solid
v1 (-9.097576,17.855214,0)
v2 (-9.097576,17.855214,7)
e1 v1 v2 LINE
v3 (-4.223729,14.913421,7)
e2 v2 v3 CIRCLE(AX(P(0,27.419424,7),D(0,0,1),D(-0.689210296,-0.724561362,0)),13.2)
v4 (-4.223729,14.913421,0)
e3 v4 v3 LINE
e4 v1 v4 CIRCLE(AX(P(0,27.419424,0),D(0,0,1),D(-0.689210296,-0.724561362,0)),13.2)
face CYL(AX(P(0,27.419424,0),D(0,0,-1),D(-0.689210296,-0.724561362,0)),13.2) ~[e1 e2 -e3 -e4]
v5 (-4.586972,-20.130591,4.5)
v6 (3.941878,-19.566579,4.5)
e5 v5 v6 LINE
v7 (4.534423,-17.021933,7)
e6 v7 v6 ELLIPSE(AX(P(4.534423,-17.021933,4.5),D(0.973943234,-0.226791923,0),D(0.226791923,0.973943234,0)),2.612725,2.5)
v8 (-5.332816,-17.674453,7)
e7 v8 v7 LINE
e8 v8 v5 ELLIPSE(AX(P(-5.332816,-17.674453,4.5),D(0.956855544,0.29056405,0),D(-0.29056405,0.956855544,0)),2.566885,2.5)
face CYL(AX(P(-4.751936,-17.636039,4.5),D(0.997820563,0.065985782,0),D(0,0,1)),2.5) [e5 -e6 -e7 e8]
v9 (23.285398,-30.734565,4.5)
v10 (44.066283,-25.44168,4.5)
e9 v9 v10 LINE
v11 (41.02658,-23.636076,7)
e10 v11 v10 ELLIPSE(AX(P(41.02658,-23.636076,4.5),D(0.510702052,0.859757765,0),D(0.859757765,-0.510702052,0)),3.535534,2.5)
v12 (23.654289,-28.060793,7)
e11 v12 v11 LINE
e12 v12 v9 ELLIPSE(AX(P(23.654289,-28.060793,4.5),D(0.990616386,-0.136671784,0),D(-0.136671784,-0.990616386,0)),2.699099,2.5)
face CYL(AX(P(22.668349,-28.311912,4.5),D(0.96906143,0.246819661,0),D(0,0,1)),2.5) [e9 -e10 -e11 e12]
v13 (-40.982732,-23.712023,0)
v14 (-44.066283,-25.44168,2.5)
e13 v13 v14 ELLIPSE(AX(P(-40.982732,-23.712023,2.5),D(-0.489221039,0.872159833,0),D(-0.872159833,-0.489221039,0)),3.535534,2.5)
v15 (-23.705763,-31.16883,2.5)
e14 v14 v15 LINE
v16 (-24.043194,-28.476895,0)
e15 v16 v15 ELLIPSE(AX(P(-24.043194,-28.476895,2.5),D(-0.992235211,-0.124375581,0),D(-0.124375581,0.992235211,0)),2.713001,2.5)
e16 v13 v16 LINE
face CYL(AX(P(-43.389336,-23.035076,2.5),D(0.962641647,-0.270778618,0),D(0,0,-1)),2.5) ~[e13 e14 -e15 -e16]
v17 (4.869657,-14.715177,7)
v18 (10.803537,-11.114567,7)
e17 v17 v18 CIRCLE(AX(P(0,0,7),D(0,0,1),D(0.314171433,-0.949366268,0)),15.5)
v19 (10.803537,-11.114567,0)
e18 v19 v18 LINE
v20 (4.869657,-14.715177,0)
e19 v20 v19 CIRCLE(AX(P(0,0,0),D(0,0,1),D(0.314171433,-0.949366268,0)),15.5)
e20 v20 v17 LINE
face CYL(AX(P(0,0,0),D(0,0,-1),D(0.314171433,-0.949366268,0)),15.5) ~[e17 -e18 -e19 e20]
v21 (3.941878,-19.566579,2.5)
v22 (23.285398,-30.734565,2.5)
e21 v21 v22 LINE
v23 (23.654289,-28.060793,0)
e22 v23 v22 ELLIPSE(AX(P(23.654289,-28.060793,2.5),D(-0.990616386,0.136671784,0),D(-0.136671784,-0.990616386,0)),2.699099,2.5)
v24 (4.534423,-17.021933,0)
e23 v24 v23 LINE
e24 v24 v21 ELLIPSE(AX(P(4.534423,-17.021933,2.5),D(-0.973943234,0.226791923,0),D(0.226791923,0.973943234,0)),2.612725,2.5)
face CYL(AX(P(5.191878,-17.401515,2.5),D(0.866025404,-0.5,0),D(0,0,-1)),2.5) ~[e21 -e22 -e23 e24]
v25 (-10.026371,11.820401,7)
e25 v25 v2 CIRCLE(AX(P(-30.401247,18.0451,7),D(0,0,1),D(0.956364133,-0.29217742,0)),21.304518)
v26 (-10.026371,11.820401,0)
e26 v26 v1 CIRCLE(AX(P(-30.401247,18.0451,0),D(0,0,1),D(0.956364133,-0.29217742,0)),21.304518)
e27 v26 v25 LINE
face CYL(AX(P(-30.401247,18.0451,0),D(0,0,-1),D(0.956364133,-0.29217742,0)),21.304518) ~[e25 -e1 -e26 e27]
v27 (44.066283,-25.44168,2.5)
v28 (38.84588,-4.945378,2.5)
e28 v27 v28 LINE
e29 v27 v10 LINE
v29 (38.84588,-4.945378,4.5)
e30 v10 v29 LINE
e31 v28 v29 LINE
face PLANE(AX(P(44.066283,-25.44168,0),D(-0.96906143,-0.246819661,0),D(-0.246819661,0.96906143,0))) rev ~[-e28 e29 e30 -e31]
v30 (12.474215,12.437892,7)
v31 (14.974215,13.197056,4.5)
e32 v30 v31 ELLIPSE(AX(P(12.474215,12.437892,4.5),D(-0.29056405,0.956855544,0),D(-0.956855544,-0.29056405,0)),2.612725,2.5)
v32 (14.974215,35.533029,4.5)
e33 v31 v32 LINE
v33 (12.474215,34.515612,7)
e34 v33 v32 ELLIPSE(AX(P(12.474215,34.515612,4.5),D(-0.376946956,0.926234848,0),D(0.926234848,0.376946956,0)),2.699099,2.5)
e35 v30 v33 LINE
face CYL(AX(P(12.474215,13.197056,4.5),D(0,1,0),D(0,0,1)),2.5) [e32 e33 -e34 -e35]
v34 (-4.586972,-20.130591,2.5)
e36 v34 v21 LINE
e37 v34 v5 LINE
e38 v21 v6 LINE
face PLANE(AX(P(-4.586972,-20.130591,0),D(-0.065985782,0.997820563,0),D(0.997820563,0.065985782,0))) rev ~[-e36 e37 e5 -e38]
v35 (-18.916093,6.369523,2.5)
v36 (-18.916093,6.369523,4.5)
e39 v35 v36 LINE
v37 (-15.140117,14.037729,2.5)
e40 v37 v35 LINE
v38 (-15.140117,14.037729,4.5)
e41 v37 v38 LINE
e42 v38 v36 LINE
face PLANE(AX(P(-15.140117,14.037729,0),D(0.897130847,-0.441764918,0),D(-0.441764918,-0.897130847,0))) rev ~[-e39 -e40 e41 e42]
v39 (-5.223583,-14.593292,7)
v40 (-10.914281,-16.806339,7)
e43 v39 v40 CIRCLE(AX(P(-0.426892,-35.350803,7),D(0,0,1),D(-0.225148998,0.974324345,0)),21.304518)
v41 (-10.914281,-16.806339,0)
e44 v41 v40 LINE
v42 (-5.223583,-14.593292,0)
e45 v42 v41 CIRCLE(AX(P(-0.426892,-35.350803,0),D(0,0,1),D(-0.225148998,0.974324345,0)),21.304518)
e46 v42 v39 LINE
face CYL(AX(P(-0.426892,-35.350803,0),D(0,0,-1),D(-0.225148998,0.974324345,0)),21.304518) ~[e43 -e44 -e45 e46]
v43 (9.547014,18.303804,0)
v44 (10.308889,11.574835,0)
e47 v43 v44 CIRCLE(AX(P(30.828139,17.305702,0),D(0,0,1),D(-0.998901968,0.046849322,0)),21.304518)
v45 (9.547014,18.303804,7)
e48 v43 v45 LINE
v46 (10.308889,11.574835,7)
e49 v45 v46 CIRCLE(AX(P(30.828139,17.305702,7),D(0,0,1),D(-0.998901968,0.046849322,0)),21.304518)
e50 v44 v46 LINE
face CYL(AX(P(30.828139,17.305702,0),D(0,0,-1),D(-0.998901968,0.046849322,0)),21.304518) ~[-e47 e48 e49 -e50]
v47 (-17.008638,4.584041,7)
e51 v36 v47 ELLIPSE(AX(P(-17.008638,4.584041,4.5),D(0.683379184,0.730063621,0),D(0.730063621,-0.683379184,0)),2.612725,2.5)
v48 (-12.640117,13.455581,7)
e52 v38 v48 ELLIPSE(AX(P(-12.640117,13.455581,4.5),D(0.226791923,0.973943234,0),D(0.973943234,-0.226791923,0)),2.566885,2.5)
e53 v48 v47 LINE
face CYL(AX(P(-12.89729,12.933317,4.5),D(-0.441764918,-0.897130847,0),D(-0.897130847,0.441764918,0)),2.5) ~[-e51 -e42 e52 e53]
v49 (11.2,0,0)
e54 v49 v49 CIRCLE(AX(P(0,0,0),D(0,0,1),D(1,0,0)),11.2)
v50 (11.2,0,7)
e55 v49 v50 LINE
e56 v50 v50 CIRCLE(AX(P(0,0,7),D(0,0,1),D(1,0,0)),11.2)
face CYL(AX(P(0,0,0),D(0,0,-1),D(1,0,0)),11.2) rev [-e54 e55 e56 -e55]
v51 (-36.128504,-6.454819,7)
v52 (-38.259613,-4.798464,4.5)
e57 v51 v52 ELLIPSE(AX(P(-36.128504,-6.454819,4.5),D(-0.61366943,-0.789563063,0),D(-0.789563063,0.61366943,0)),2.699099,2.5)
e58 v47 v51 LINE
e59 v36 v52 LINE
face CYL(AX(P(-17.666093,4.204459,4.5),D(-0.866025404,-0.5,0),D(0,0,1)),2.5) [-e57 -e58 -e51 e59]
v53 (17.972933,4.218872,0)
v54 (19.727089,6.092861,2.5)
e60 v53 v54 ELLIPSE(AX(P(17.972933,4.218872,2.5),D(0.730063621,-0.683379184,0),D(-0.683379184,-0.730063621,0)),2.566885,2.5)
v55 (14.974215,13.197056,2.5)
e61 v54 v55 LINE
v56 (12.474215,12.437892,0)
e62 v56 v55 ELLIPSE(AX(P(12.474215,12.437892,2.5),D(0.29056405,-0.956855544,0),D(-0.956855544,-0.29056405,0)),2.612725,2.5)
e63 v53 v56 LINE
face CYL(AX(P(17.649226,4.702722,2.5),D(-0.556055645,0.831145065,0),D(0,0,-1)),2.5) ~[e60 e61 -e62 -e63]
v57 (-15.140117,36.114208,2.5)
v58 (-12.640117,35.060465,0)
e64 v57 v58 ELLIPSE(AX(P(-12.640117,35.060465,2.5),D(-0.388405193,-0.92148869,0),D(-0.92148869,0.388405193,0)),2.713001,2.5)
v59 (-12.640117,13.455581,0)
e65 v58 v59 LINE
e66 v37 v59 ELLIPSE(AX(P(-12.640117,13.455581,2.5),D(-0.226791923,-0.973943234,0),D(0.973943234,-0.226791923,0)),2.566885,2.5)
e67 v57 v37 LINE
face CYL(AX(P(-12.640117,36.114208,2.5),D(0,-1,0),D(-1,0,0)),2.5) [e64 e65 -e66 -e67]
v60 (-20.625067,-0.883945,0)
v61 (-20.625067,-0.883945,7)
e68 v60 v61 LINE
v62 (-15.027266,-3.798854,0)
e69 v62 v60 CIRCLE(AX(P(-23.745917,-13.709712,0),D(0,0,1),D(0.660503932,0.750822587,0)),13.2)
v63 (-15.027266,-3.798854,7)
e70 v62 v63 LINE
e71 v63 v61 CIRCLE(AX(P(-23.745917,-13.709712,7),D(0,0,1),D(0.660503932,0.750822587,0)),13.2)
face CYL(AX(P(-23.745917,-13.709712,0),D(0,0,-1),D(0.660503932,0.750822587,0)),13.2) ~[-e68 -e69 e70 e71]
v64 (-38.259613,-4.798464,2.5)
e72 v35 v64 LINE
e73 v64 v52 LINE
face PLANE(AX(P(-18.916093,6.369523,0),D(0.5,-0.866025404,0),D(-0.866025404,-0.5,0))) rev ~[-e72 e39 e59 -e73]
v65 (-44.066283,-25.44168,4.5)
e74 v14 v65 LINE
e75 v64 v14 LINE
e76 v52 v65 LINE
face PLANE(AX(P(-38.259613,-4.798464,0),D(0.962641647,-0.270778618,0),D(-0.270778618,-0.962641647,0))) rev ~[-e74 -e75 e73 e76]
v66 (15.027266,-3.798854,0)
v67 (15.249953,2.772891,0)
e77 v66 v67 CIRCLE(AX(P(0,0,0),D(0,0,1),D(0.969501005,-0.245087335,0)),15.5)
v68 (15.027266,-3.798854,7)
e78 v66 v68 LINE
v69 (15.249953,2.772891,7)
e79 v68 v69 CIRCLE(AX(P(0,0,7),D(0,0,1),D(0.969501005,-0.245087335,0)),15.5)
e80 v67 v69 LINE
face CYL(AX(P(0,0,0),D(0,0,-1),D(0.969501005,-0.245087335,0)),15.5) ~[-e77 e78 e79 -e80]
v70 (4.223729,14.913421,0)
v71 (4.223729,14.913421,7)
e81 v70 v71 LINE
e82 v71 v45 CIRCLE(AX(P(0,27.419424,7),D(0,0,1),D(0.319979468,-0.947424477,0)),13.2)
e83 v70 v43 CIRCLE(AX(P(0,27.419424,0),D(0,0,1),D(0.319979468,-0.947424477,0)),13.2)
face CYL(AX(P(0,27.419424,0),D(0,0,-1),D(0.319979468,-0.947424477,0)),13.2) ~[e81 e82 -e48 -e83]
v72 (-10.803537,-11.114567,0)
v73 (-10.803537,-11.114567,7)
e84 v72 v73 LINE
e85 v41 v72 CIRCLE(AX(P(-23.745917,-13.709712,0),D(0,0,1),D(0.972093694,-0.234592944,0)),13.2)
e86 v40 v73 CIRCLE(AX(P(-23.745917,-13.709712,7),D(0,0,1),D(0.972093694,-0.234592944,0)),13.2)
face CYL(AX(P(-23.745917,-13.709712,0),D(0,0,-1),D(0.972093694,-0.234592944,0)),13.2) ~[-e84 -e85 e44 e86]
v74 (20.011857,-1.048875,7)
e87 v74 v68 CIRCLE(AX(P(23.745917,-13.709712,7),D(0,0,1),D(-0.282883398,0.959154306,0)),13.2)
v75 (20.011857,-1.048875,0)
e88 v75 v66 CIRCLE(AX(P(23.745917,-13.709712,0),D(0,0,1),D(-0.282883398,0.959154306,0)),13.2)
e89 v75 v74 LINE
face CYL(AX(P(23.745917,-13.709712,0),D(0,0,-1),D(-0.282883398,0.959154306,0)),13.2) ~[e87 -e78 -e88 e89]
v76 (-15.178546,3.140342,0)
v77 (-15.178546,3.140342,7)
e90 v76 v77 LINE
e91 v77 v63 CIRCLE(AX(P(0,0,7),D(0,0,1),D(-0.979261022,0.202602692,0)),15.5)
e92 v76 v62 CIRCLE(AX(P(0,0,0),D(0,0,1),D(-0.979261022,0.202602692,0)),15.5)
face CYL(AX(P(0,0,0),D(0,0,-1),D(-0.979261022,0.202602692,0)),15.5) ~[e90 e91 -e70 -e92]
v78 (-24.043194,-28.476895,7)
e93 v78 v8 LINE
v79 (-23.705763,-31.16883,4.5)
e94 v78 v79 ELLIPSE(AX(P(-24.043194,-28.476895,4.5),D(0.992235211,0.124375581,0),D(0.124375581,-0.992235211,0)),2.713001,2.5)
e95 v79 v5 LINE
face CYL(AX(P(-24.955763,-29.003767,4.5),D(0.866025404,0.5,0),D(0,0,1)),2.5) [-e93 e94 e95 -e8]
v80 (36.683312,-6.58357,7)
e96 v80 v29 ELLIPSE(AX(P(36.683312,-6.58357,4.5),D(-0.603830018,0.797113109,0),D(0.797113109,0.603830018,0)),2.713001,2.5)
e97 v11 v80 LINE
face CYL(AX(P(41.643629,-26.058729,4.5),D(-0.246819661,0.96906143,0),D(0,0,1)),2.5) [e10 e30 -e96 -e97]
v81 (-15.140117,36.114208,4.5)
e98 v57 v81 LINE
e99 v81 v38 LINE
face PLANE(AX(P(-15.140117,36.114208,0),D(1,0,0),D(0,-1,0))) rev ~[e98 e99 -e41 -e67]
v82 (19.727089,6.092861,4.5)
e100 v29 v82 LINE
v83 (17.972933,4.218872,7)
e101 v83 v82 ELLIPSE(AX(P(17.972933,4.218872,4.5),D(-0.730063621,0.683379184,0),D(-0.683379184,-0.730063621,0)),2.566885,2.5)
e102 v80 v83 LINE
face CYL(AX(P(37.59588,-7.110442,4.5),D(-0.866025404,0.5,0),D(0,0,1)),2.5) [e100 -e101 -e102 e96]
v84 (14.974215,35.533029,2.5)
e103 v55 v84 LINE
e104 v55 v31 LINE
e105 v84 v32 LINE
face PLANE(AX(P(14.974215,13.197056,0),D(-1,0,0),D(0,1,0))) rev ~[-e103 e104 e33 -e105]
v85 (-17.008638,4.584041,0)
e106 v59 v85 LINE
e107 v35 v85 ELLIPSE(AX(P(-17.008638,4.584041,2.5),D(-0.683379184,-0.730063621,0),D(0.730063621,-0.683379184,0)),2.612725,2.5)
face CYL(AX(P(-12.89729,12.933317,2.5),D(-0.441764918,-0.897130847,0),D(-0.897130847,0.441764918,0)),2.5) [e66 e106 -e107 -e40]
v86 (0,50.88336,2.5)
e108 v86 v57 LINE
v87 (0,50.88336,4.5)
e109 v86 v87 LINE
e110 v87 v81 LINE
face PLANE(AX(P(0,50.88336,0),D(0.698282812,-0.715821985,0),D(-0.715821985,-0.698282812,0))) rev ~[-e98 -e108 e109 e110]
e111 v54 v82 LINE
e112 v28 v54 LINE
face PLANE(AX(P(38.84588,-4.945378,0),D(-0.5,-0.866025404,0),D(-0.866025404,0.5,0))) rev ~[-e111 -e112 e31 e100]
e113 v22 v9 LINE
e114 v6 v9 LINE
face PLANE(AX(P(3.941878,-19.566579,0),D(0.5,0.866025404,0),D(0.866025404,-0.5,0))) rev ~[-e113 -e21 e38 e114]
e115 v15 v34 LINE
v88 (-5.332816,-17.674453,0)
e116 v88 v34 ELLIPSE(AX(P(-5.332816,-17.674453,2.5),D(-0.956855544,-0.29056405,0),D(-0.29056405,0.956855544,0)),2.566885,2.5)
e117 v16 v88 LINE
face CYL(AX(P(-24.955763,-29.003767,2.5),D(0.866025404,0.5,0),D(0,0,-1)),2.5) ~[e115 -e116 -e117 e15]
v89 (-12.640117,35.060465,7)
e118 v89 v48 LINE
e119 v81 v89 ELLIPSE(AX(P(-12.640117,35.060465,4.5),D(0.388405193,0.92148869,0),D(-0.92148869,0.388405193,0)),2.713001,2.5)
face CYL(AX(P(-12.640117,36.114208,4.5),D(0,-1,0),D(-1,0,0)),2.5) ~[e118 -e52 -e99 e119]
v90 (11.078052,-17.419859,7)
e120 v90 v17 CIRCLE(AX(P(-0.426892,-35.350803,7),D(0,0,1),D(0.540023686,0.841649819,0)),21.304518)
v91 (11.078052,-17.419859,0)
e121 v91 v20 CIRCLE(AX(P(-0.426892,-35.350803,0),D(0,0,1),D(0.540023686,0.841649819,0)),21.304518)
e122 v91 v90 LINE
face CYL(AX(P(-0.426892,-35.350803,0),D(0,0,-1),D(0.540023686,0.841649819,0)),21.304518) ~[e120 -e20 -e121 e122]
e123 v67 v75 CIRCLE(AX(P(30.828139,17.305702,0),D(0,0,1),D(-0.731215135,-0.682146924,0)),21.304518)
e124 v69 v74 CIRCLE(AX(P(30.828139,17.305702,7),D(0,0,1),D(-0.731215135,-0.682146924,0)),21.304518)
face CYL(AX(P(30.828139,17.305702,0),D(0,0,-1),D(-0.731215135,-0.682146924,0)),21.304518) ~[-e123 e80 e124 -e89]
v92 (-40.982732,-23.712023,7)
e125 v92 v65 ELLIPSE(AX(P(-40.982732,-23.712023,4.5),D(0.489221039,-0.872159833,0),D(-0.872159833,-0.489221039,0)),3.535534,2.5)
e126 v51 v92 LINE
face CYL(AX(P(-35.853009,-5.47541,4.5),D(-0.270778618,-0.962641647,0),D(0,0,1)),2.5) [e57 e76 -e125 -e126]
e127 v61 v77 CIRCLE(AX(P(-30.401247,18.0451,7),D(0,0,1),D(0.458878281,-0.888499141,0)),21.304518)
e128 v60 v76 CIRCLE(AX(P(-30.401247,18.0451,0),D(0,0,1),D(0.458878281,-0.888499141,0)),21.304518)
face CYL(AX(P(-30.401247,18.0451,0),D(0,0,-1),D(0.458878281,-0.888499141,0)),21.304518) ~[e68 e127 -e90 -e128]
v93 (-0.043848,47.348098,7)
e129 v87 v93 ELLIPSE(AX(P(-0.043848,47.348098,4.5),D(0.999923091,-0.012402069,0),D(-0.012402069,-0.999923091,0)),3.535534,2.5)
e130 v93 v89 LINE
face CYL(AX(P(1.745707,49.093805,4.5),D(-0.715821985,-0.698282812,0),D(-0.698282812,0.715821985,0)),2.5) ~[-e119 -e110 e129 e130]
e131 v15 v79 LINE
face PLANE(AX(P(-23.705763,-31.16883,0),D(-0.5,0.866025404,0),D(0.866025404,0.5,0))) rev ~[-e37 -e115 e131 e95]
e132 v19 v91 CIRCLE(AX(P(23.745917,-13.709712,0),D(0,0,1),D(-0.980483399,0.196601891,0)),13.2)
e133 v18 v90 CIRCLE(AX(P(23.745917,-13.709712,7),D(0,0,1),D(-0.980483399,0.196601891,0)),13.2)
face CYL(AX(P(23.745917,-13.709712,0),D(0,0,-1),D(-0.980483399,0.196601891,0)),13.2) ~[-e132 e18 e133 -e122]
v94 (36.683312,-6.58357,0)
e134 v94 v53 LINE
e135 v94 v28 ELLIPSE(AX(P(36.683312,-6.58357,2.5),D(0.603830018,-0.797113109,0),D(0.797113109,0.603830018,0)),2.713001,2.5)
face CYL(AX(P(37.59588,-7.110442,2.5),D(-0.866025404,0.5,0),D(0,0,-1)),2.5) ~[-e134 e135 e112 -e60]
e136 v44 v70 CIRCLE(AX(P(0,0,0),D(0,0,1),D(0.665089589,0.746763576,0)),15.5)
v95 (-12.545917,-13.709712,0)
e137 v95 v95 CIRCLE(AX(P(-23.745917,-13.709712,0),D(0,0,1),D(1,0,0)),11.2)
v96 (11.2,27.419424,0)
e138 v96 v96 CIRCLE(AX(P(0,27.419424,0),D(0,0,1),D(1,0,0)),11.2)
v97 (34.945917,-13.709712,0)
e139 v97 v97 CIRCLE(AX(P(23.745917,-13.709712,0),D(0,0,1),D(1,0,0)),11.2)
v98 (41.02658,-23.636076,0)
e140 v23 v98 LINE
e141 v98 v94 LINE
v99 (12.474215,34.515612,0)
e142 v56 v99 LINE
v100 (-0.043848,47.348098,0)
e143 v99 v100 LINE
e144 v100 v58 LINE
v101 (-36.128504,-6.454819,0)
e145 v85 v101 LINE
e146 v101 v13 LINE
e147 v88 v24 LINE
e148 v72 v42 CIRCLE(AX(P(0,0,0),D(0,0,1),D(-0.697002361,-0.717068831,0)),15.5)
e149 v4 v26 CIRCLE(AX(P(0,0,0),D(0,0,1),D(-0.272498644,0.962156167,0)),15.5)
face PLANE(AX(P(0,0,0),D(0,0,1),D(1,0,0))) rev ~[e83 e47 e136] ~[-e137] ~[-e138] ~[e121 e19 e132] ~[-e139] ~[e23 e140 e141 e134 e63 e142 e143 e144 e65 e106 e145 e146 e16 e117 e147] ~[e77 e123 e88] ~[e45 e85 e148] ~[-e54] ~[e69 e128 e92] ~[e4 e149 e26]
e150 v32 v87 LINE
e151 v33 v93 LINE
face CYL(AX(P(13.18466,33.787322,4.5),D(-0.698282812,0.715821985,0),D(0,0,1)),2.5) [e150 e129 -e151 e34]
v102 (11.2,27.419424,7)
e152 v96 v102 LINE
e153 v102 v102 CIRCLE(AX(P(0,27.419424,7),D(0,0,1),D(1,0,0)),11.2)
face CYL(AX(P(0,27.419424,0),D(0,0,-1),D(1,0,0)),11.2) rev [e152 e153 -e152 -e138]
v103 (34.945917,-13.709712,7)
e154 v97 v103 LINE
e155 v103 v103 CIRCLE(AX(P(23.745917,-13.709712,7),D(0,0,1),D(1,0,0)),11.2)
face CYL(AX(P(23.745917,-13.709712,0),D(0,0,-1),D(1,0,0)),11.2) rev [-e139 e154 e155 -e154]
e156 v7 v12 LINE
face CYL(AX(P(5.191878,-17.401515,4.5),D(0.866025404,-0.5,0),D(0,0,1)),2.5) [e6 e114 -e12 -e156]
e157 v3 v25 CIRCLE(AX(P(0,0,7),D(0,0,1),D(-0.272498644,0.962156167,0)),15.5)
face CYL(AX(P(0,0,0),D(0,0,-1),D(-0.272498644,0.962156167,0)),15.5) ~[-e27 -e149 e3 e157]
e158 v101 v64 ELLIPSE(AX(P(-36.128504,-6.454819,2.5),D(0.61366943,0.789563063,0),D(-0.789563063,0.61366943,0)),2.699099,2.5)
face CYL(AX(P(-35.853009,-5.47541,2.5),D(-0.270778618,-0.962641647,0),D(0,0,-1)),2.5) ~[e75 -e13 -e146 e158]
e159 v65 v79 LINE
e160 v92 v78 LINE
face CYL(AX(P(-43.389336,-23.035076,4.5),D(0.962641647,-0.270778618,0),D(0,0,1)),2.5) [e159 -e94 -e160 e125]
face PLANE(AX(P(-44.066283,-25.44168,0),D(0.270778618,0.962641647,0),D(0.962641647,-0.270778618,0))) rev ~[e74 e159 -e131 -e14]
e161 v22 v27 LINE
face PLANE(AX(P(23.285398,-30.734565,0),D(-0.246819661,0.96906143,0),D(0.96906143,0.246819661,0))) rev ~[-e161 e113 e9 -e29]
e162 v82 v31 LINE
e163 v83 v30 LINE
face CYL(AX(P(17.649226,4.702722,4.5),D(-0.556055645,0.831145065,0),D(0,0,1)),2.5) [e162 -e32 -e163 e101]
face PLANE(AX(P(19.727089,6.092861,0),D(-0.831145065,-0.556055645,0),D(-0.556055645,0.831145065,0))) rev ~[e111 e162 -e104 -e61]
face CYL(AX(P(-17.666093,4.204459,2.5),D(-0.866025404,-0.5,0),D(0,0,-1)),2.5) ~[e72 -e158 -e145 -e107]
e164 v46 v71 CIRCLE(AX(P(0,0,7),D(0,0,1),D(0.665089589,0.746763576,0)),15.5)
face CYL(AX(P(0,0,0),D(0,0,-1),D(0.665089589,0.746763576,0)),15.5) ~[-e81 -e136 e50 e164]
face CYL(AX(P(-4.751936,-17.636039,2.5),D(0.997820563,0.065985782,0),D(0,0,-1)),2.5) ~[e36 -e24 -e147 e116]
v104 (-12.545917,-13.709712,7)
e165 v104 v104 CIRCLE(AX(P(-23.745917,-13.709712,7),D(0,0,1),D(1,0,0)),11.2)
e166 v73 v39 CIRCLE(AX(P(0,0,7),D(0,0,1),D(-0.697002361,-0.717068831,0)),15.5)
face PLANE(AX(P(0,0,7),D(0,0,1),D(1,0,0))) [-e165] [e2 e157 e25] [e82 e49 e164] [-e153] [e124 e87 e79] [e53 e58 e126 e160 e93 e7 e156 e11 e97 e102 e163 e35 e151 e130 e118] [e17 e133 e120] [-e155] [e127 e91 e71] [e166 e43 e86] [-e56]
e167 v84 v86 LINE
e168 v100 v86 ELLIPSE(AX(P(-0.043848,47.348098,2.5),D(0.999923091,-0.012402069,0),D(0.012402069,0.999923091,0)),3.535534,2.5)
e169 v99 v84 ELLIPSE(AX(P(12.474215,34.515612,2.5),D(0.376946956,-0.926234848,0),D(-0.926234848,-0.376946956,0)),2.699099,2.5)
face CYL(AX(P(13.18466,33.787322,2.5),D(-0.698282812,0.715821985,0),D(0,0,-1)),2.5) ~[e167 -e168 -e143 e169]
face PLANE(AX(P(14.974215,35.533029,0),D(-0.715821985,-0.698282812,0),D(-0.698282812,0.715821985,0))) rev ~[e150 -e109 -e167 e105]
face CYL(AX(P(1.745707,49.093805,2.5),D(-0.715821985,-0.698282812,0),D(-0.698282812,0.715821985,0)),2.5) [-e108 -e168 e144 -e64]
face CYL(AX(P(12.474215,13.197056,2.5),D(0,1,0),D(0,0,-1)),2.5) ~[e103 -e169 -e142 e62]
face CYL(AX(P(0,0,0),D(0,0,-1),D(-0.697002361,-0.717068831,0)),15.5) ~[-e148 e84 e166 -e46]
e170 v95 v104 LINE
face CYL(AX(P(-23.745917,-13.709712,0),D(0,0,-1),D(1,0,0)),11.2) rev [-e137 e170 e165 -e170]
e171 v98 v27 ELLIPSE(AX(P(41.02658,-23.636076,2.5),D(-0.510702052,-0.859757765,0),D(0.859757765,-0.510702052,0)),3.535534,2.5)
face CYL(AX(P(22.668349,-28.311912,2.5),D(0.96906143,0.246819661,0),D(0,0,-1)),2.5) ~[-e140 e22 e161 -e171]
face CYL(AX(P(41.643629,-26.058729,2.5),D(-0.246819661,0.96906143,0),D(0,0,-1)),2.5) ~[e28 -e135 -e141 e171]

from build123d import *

# Parameters (mm, degrees)
F0_R     = 11.2
F1_DEPTH = 7
F3_DEPTH = 7
F4_DEPTH = 7
F5_R     = 2.5


# Not quite as in the source:
# - the program builds the solid bodies; features that only make, move or delete a surface that nothing else refers to are left out


with BuildPart() as f1:
    # F0 (on Top) → F1 (new body)
    with BuildSketch(Plane.XY):
        Polygon((-15.1401171461, 36.1142084002), (-15.1401171461, 14.037729241), (-18.916093286, 6.3695226165), (-38.2596134255, -4.7984639431), (-44.0662825692, -25.4416801035), (-23.7057633391, -31.1688302649), (-4.5869715611, -20.1305906853), (3.9418782472, -19.5665786343), (23.2853983866, -30.7345651939), (44.0662825692, -25.4416801035), (38.8458804852, -4.9453781354), (19.7270887072, 6.0928614443), (14.9742150389, 13.1970560178), (14.9742150389, 35.533029137), (0, 50.8833602071), align=None)
        with Locations((-23.7459174679, -13.7097118422)):
            Circle(F0_R, mode=Mode.SUBTRACT)
        with BuildLine():
            ThreePointArc((-5.2235825218, -14.5932924879), (-8.1486251459, -15.4948890799), (-10.9142807021, -16.8063387022))
            ThreePointArc((-10.9142807021, -16.8063387022), (-10.5484153212, -13.966494024), (-10.8035365954, -11.1145668846))
            ThreePointArc((-10.8035365954, -11.1145668846), (-8.2001536422, -13.1532307911), (-5.2235825218, -14.5932924879))
        make_face(mode=Mode.SUBTRACT)
        with BuildLine():
            ThreePointArc((-15.1785458421, 3.1403417202), (-15.4963179195, -0.3378327056), (-15.0272655718, -3.7988537))
            ThreePointArc((-15.0272655718, -3.7988537), (-17.6493915658, -2.0019207643), (-20.6250668218, -0.88394515))
            ThreePointArc((-20.6250668218, -0.88394515), (-17.7408860989, 0.9104067971), (-15.1785458421, 3.1403417202))
        make_face(mode=Mode.SUBTRACT)
        with BuildLine():
            ThreePointArc((4.8696572148, -14.7151771518), (8.040730665, -13.2512886306), (10.8035365954, -11.1145668846))
            ThreePointArc((10.8035365954, -11.1145668846), (10.5584100211, -14.2838610751), (11.0780523663, -17.4198592474))
            ThreePointArc((11.0780523663, -17.4198592474), (8.0820076354, -15.8192614458), (4.8696572148, -14.7151771518))
        make_face(mode=Mode.SUBTRACT)
        with Locations((23.7459174679, -13.7097118422)):
            Circle(F0_R, mode=Mode.SUBTRACT)
        with BuildLine():
            ThreePointArc((15.2499532803, 2.7728910813), (17.493280145, 0.6905281577), (20.0118566117, -1.0488750009))
            ThreePointArc((20.0118566117, -1.0488750009), (17.3695462872, -2.1519486258), (15.0272655718, -3.7988537))
            ThreePointArc((15.0272655718, -3.7988537), (15.491108828, -0.5249259735), (15.2499532803, 2.7728910813))
        make_face(mode=Mode.SUBTRACT)
        Circle(F0_R, mode=Mode.SUBTRACT)
        with BuildLine():
            ThreePointArc((-9.0975759097, 17.8552137031), (-6.821130966, 16.1184426499), (-4.2237289764, 14.9134205846))
            ThreePointArc((-4.2237289764, 14.9134205846), (-7.2909551859, 13.6781567646), (-10.0263707585, 11.8204014066))
            ThreePointArc((-10.0263707585, 11.8204014066), (-9.3446549991, 14.8043609222), (-9.0975759097, 17.8552137031))
        make_face(mode=Mode.SUBTRACT)
        with BuildLine():
            ThreePointArc((4.2237289764, 14.9134205846), (7.0909815446, 16.2857818394), (9.5470144555, 18.3038043974))
            ThreePointArc((9.5470144555, 18.3038043974), (9.6588784635, 14.9088546487), (10.3088886273, 11.5748354317))
            ThreePointArc((10.3088886273, 11.5748354317), (7.4555872545, 13.5891213362), (4.2237289764, 14.9134205846))
        make_face(mode=Mode.SUBTRACT)
        with Locations((0, 27.4194236845)):
            Circle(F0_R, mode=Mode.SUBTRACT)
    extrude(amount=F1_DEPTH)

    # F0 (on Top) → F3 (join)
    with BuildSketch(Plane.XY):
        Polygon((-15.1401171461, 36.1142084002), (-15.1401171461, 14.037729241), (-18.916093286, 6.3695226165), (-38.2596134255, -4.7984639431), (-44.0662825692, -25.4416801035), (-23.7057633391, -31.1688302649), (-4.5869715611, -20.1305906853), (3.9418782472, -19.5665786343), (23.2853983866, -30.7345651939), (44.0662825692, -25.4416801035), (38.8458804852, -4.9453781354), (19.7270887072, 6.0928614443), (14.9742150389, 13.1970560178), (14.9742150389, 35.533029137), (0, 50.8833602071), align=None)
        with Locations((-23.7459174679, -13.7097118422)):
            Circle(F0_R, mode=Mode.SUBTRACT)
        with BuildLine():
            ThreePointArc((-5.2235825218, -14.5932924879), (-8.1486251459, -15.4948890799), (-10.9142807021, -16.8063387022))
            ThreePointArc((-10.9142807021, -16.8063387022), (-10.5484153212, -13.966494024), (-10.8035365954, -11.1145668846))
            ThreePointArc((-10.8035365954, -11.1145668846), (-8.2001536422, -13.1532307911), (-5.2235825218, -14.5932924879))
        make_face(mode=Mode.SUBTRACT)
        with BuildLine():
            ThreePointArc((-15.1785458421, 3.1403417202), (-15.4963179195, -0.3378327056), (-15.0272655718, -3.7988537))
            ThreePointArc((-15.0272655718, -3.7988537), (-17.6493915658, -2.0019207643), (-20.6250668218, -0.88394515))
            ThreePointArc((-20.6250668218, -0.88394515), (-17.7408860989, 0.9104067971), (-15.1785458421, 3.1403417202))
        make_face(mode=Mode.SUBTRACT)
        with BuildLine():
            ThreePointArc((4.8696572148, -14.7151771518), (8.040730665, -13.2512886306), (10.8035365954, -11.1145668846))
            ThreePointArc((10.8035365954, -11.1145668846), (10.5584100211, -14.2838610751), (11.0780523663, -17.4198592474))
            ThreePointArc((11.0780523663, -17.4198592474), (8.0820076354, -15.8192614458), (4.8696572148, -14.7151771518))
        make_face(mode=Mode.SUBTRACT)
        with Locations((23.7459174679, -13.7097118422)):
            Circle(F0_R, mode=Mode.SUBTRACT)
        with BuildLine():
            ThreePointArc((15.2499532803, 2.7728910813), (17.493280145, 0.6905281577), (20.0118566117, -1.0488750009))
            ThreePointArc((20.0118566117, -1.0488750009), (17.3695462872, -2.1519486258), (15.0272655718, -3.7988537))
            ThreePointArc((15.0272655718, -3.7988537), (15.491108828, -0.5249259735), (15.2499532803, 2.7728910813))
        make_face(mode=Mode.SUBTRACT)
        Circle(F0_R, mode=Mode.SUBTRACT)
        with BuildLine():
            ThreePointArc((-9.0975759097, 17.8552137031), (-6.821130966, 16.1184426499), (-4.2237289764, 14.9134205846))
            ThreePointArc((-4.2237289764, 14.9134205846), (-7.2909551859, 13.6781567646), (-10.0263707585, 11.8204014066))
            ThreePointArc((-10.0263707585, 11.8204014066), (-9.3446549991, 14.8043609222), (-9.0975759097, 17.8552137031))
        make_face(mode=Mode.SUBTRACT)
        with BuildLine():
            ThreePointArc((4.2237289764, 14.9134205846), (7.0909815446, 16.2857818394), (9.5470144555, 18.3038043974))
            ThreePointArc((9.5470144555, 18.3038043974), (9.6588784635, 14.9088546487), (10.3088886273, 11.5748354317))
            ThreePointArc((10.3088886273, 11.5748354317), (7.4555872545, 13.5891213362), (4.2237289764, 14.9134205846))
        make_face(mode=Mode.SUBTRACT)
        with Locations((0, 27.4194236845)):
            Circle(F0_R, mode=Mode.SUBTRACT)
    extrude(amount=F3_DEPTH)

    # F0 (on Top) → F4 (join)
    with BuildSketch(Plane.XY):
        Polygon((-15.1401171461, 36.1142084002), (-15.1401171461, 14.037729241), (-18.916093286, 6.3695226165), (-38.2596134255, -4.7984639431), (-44.0662825692, -25.4416801035), (-23.7057633391, -31.1688302649), (-4.5869715611, -20.1305906853), (3.9418782472, -19.5665786343), (23.2853983866, -30.7345651939), (44.0662825692, -25.4416801035), (38.8458804852, -4.9453781354), (19.7270887072, 6.0928614443), (14.9742150389, 13.1970560178), (14.9742150389, 35.533029137), (0, 50.8833602071), align=None)
        with Locations((-23.7459174679, -13.7097118422)):
            Circle(F0_R, mode=Mode.SUBTRACT)
        with BuildLine():
            ThreePointArc((-5.2235825218, -14.5932924879), (-8.1486251459, -15.4948890799), (-10.9142807021, -16.8063387022))
            ThreePointArc((-10.9142807021, -16.8063387022), (-10.5484153212, -13.966494024), (-10.8035365954, -11.1145668846))
            ThreePointArc((-10.8035365954, -11.1145668846), (-8.2001536422, -13.1532307911), (-5.2235825218, -14.5932924879))
        make_face(mode=Mode.SUBTRACT)
        with BuildLine():
            ThreePointArc((-15.1785458421, 3.1403417202), (-15.4963179195, -0.3378327056), (-15.0272655718, -3.7988537))
            ThreePointArc((-15.0272655718, -3.7988537), (-17.6493915658, -2.0019207643), (-20.6250668218, -0.88394515))
            ThreePointArc((-20.6250668218, -0.88394515), (-17.7408860989, 0.9104067971), (-15.1785458421, 3.1403417202))
        make_face(mode=Mode.SUBTRACT)
        with BuildLine():
            ThreePointArc((4.8696572148, -14.7151771518), (8.040730665, -13.2512886306), (10.8035365954, -11.1145668846))
            ThreePointArc((10.8035365954, -11.1145668846), (10.5584100211, -14.2838610751), (11.0780523663, -17.4198592474))
            ThreePointArc((11.0780523663, -17.4198592474), (8.0820076354, -15.8192614458), (4.8696572148, -14.7151771518))
        make_face(mode=Mode.SUBTRACT)
        with Locations((23.7459174679, -13.7097118422)):
            Circle(F0_R, mode=Mode.SUBTRACT)
        with BuildLine():
            ThreePointArc((15.2499532803, 2.7728910813), (17.493280145, 0.6905281577), (20.0118566117, -1.0488750009))
            ThreePointArc((20.0118566117, -1.0488750009), (17.3695462872, -2.1519486258), (15.0272655718, -3.7988537))
            ThreePointArc((15.0272655718, -3.7988537), (15.491108828, -0.5249259735), (15.2499532803, 2.7728910813))
        make_face(mode=Mode.SUBTRACT)
        Circle(F0_R, mode=Mode.SUBTRACT)
        with BuildLine():
            ThreePointArc((-9.0975759097, 17.8552137031), (-6.821130966, 16.1184426499), (-4.2237289764, 14.9134205846))
            ThreePointArc((-4.2237289764, 14.9134205846), (-7.2909551859, 13.6781567646), (-10.0263707585, 11.8204014066))
            ThreePointArc((-10.0263707585, 11.8204014066), (-9.3446549991, 14.8043609222), (-9.0975759097, 17.8552137031))
        make_face(mode=Mode.SUBTRACT)
        with BuildLine():
            ThreePointArc((4.2237289764, 14.9134205846), (7.0909815446, 16.2857818394), (9.5470144555, 18.3038043974))
            ThreePointArc((9.5470144555, 18.3038043974), (9.6588784635, 14.9088546487), (10.3088886273, 11.5748354317))
            ThreePointArc((10.3088886273, 11.5748354317), (7.4555872545, 13.5891213362), (4.2237289764, 14.9134205846))
        make_face(mode=Mode.SUBTRACT)
        with Locations((0, 27.4194236845)):
            Circle(F0_R, mode=Mode.SUBTRACT)
    extrude(amount=F4_DEPTH)

    # F5
    f5_edges = [f1.edges().sort_by_distance(p)[0] for p in [
        (-7.570059, 43.498784, 7),
        (-15.140117, 25.075969, 7),
        (-17.028105, 10.203626, 7),
        (-28.587853, 0.785529, 7),
        (-41.162948, -15.120072, 7),
        (-33.886023, -28.305255, 7),
        (-14.146367, -25.64971, 7),
        (-0.322547, -19.848585, 7),
        (13.613638, -25.150572, 7),
        (33.67584, -28.088123, 7),
        (41.456082, -15.193529, 7),
        (29.286485, 0.573742, 7),
        (17.350652, 9.644959, 7),
        (14.974215, 24.365043, 7),
        (7.487108, 43.208195, 7),
        (7.487108, 43.208195, 0),
        (-7.570059, 43.498784, 0),
        (-15.140117, 25.075969, 0),
        (-17.028105, 10.203626, 0),
        (-14.146367, -25.64971, 0),
        (-0.322547, -19.848585, 0),
        (13.613638, -25.150572, 0),
        (33.67584, -28.088123, 0),
        (41.456082, -15.193529, 0),
        (29.286485, 0.573742, 0),
        (17.350652, 9.644959, 0),
        (14.974215, 24.365043, 0),
        (-28.587853, 0.785529, 0),
        (-41.162948, -15.120072, 0),
        (-33.886023, -28.305255, 0),
    ]]
    fillet(f5_edges, radius=F5_R)


solid = f1.part
